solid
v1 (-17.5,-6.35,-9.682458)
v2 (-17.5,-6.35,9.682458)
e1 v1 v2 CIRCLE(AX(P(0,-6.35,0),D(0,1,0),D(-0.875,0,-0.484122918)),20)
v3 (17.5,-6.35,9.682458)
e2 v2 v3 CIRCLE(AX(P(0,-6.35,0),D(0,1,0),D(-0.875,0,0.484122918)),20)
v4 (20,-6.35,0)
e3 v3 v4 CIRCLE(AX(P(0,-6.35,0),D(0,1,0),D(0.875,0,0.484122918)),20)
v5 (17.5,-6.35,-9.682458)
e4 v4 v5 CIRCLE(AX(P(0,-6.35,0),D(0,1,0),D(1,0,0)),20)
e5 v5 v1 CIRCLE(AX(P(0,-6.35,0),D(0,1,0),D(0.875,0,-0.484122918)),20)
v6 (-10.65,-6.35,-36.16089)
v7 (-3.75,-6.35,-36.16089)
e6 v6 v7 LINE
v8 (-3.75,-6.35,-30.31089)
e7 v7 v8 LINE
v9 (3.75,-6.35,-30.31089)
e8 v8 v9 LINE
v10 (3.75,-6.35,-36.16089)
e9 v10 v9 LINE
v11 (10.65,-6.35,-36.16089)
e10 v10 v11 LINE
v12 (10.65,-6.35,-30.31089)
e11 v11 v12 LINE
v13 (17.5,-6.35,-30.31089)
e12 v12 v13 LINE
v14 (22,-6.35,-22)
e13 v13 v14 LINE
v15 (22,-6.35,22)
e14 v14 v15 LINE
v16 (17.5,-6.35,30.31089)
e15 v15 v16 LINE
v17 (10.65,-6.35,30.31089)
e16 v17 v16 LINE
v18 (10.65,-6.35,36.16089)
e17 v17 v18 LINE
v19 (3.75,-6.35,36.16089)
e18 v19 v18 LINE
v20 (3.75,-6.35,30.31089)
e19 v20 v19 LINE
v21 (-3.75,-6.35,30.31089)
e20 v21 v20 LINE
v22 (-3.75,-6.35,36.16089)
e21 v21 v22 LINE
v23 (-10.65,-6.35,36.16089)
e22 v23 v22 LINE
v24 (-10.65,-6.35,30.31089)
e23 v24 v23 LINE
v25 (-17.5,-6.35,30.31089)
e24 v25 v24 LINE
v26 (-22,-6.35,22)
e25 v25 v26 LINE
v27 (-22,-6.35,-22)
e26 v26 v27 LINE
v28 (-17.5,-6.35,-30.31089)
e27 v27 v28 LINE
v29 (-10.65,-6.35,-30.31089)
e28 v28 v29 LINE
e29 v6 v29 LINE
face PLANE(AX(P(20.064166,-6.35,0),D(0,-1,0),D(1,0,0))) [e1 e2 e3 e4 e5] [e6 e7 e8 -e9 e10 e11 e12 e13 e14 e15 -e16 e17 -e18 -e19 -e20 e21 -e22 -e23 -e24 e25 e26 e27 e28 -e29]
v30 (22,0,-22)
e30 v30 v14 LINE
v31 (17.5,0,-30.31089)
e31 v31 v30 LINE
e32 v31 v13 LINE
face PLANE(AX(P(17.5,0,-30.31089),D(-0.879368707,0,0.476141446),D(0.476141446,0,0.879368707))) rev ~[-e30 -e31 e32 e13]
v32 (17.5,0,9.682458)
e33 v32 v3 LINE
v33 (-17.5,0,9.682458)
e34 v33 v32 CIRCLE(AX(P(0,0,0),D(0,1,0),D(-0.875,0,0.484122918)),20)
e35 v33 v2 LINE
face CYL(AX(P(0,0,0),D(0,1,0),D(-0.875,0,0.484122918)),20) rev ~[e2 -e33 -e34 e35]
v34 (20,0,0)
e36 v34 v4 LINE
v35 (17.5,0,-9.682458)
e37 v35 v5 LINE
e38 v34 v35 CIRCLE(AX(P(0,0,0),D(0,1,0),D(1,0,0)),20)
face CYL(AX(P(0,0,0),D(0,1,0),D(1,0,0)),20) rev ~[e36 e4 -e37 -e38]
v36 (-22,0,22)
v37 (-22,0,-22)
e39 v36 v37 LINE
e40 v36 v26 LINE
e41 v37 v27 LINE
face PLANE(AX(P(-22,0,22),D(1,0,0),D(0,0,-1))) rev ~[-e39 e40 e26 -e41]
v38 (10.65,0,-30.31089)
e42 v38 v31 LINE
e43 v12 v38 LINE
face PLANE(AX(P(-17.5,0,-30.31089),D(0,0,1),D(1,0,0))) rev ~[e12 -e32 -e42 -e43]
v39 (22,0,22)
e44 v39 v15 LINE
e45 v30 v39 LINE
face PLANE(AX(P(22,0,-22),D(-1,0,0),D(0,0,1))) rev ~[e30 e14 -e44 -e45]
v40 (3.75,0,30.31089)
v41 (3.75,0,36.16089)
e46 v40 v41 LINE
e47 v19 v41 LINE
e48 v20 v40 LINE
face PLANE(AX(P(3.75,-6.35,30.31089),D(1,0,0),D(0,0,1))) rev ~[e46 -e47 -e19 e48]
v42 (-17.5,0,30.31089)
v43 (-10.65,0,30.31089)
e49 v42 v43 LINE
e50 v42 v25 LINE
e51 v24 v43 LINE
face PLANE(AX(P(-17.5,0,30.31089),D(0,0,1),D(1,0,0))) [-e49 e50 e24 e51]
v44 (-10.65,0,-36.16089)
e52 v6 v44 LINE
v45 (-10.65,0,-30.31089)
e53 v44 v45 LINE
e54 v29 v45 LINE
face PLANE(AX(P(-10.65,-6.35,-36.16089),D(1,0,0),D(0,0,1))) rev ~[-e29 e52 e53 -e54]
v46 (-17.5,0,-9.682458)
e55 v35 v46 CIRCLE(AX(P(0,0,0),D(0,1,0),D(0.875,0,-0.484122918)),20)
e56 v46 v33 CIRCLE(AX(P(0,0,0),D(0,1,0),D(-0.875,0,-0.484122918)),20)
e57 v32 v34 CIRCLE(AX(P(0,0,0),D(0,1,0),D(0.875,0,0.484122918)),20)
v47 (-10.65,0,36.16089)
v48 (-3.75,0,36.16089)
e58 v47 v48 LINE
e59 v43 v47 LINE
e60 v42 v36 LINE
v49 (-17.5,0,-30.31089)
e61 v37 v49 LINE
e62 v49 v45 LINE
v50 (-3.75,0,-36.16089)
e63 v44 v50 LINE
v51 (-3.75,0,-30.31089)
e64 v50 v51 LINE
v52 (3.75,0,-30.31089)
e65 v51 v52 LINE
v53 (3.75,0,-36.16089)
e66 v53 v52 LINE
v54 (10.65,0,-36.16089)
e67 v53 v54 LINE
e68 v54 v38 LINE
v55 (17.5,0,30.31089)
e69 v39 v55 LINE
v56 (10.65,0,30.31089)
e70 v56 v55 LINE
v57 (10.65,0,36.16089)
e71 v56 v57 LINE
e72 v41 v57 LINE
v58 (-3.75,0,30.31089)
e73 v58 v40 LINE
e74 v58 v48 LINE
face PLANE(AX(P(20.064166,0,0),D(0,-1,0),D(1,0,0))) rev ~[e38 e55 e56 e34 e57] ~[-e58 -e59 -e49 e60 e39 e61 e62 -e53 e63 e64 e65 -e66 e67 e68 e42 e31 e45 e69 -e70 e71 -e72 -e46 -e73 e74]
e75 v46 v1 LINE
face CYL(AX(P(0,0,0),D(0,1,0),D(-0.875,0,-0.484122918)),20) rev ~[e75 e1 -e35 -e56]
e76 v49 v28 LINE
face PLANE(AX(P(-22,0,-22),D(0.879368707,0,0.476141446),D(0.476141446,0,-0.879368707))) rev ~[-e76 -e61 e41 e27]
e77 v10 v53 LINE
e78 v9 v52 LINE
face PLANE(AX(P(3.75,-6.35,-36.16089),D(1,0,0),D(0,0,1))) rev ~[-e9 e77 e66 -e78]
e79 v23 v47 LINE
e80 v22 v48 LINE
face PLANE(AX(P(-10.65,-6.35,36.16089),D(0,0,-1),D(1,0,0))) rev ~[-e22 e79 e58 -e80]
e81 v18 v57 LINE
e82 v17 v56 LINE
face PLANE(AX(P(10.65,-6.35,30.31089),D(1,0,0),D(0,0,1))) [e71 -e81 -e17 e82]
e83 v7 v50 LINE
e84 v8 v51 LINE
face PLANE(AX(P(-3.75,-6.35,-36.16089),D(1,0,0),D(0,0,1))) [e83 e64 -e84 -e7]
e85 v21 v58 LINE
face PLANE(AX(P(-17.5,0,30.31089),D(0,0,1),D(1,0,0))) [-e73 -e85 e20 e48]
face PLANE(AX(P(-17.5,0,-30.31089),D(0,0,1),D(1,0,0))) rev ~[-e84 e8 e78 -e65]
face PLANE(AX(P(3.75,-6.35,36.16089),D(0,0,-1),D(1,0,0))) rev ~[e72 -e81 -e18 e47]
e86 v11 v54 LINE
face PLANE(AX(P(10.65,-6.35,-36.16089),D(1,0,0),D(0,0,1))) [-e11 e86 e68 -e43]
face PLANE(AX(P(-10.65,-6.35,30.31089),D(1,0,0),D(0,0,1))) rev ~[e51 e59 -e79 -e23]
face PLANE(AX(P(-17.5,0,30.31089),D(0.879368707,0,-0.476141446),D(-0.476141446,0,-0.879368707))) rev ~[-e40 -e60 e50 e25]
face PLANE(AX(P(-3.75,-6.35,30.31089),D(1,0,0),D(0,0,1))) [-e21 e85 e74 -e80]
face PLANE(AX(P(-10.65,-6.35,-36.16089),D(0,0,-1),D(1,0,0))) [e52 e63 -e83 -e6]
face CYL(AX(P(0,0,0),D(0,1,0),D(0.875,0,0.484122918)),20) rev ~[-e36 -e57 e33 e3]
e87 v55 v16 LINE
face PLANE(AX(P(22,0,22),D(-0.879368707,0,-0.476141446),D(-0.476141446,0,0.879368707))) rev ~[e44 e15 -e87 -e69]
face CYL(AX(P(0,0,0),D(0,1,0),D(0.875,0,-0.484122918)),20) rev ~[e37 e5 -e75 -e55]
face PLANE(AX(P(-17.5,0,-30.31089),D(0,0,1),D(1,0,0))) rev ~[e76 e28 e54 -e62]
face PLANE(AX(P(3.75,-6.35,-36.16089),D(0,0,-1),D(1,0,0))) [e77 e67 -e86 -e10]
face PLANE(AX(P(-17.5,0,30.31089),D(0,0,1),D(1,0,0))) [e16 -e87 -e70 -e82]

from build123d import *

# Parameters (mm, degrees)
F0_W     = 35
F0_H     = 8.31089
F1_DEPTH = 6.35
F2_W     = 6.9
F2_H     = 5.85
F3_DEPTH = 6.35


# Not quite as in the source:
# - a length typed as a fraction of an inch, garbled in the dataset ("3 / 203.2 mm" for 3/8 in), is restored


with BuildPart() as f1:
    # F0 (on Front) → F1 (new body)
    with BuildSketch(Plane.XZ):
        with BuildLine():
            ThreePointArc((17.5, 9.6824583655), (19.364916731, 5), (20, 0))
            ThreePointArc((20, 0), (19.364916731, -5), (17.5, -9.6824583655))
            Line((17.5, -9.6824583655), (17.5, -22))
            Line((17.5, -22), (22, -22))
            Line((22, -22), (22, 22))
            Line((22, 22), (17.5, 22))
            Line((17.5, 22), (17.5, 9.6824583655))
        make_face()
        with BuildLine():
            ThreePointArc((-17.5, -9.6824583655), (-20, 0), (-17.5, 9.6824583655))
            Line((-17.5, 9.6824583655), (-17.5, 22))
            Line((-17.5, 22), (-22, 22))
            Line((-22, 22), (-22, -22))
            Line((-22, -22), (-17.5, -22))
            Line((-17.5, -22), (-17.5, -9.6824583655))
        make_face()
        with Locations((0, 26.155445)):
            Rectangle(F0_W, F0_H)
        Polygon((17.5, 30.31089), (17.5, 22), (22, 22), align=None)
        Polygon((22, -22), (17.5, -22), (17.5, -30.31089), align=None)
        with Locations((0, -26.155445)):
            Rectangle(F0_W, F0_H)
        Polygon((-22, 22), (-17.5, 22), (-17.5, 30.31089), align=None)
        Polygon((-17.5, -30.31089), (-17.5, -22), (-22, -22), align=None)
        with BuildLine():
            ThreePointArc((-17.5, 9.6824583655), (0, 20), (17.5, 9.6824583655))
            Line((17.5, 9.6824583655), (17.5, 22))
            Line((17.5, 22), (-17.5, 22))
            Line((-17.5, 22), (-17.5, 9.6824583655))
        make_face()
        with BuildLine():
            Line((17.5, -22), (17.5, -9.6824583655))
            ThreePointArc((17.5, -9.6824583655), (0, -20), (-17.5, -9.6824583655))
            Line((-17.5, -9.6824583655), (-17.5, -22))
            Line((-17.5, -22), (17.5, -22))
        make_face()
    extrude(amount=F1_DEPTH)

    # F2 (on face) → F3 (join)
    with BuildSketch(Plane.XZ.offset(6.35)):
        with Locations((-7.2, 33.23589)):
            Rectangle(F2_W, F2_H)
        with Locations((7.2, 33.23589)):
            Rectangle(F2_W, F2_H)
        with Locations((-7.2, -33.23589)):
            Rectangle(F2_W, F2_H)
        with Locations((7.2, -33.23589)):
            Rectangle(F2_W, F2_H)
    extrude(amount=-F3_DEPTH)


solid = f1.part
